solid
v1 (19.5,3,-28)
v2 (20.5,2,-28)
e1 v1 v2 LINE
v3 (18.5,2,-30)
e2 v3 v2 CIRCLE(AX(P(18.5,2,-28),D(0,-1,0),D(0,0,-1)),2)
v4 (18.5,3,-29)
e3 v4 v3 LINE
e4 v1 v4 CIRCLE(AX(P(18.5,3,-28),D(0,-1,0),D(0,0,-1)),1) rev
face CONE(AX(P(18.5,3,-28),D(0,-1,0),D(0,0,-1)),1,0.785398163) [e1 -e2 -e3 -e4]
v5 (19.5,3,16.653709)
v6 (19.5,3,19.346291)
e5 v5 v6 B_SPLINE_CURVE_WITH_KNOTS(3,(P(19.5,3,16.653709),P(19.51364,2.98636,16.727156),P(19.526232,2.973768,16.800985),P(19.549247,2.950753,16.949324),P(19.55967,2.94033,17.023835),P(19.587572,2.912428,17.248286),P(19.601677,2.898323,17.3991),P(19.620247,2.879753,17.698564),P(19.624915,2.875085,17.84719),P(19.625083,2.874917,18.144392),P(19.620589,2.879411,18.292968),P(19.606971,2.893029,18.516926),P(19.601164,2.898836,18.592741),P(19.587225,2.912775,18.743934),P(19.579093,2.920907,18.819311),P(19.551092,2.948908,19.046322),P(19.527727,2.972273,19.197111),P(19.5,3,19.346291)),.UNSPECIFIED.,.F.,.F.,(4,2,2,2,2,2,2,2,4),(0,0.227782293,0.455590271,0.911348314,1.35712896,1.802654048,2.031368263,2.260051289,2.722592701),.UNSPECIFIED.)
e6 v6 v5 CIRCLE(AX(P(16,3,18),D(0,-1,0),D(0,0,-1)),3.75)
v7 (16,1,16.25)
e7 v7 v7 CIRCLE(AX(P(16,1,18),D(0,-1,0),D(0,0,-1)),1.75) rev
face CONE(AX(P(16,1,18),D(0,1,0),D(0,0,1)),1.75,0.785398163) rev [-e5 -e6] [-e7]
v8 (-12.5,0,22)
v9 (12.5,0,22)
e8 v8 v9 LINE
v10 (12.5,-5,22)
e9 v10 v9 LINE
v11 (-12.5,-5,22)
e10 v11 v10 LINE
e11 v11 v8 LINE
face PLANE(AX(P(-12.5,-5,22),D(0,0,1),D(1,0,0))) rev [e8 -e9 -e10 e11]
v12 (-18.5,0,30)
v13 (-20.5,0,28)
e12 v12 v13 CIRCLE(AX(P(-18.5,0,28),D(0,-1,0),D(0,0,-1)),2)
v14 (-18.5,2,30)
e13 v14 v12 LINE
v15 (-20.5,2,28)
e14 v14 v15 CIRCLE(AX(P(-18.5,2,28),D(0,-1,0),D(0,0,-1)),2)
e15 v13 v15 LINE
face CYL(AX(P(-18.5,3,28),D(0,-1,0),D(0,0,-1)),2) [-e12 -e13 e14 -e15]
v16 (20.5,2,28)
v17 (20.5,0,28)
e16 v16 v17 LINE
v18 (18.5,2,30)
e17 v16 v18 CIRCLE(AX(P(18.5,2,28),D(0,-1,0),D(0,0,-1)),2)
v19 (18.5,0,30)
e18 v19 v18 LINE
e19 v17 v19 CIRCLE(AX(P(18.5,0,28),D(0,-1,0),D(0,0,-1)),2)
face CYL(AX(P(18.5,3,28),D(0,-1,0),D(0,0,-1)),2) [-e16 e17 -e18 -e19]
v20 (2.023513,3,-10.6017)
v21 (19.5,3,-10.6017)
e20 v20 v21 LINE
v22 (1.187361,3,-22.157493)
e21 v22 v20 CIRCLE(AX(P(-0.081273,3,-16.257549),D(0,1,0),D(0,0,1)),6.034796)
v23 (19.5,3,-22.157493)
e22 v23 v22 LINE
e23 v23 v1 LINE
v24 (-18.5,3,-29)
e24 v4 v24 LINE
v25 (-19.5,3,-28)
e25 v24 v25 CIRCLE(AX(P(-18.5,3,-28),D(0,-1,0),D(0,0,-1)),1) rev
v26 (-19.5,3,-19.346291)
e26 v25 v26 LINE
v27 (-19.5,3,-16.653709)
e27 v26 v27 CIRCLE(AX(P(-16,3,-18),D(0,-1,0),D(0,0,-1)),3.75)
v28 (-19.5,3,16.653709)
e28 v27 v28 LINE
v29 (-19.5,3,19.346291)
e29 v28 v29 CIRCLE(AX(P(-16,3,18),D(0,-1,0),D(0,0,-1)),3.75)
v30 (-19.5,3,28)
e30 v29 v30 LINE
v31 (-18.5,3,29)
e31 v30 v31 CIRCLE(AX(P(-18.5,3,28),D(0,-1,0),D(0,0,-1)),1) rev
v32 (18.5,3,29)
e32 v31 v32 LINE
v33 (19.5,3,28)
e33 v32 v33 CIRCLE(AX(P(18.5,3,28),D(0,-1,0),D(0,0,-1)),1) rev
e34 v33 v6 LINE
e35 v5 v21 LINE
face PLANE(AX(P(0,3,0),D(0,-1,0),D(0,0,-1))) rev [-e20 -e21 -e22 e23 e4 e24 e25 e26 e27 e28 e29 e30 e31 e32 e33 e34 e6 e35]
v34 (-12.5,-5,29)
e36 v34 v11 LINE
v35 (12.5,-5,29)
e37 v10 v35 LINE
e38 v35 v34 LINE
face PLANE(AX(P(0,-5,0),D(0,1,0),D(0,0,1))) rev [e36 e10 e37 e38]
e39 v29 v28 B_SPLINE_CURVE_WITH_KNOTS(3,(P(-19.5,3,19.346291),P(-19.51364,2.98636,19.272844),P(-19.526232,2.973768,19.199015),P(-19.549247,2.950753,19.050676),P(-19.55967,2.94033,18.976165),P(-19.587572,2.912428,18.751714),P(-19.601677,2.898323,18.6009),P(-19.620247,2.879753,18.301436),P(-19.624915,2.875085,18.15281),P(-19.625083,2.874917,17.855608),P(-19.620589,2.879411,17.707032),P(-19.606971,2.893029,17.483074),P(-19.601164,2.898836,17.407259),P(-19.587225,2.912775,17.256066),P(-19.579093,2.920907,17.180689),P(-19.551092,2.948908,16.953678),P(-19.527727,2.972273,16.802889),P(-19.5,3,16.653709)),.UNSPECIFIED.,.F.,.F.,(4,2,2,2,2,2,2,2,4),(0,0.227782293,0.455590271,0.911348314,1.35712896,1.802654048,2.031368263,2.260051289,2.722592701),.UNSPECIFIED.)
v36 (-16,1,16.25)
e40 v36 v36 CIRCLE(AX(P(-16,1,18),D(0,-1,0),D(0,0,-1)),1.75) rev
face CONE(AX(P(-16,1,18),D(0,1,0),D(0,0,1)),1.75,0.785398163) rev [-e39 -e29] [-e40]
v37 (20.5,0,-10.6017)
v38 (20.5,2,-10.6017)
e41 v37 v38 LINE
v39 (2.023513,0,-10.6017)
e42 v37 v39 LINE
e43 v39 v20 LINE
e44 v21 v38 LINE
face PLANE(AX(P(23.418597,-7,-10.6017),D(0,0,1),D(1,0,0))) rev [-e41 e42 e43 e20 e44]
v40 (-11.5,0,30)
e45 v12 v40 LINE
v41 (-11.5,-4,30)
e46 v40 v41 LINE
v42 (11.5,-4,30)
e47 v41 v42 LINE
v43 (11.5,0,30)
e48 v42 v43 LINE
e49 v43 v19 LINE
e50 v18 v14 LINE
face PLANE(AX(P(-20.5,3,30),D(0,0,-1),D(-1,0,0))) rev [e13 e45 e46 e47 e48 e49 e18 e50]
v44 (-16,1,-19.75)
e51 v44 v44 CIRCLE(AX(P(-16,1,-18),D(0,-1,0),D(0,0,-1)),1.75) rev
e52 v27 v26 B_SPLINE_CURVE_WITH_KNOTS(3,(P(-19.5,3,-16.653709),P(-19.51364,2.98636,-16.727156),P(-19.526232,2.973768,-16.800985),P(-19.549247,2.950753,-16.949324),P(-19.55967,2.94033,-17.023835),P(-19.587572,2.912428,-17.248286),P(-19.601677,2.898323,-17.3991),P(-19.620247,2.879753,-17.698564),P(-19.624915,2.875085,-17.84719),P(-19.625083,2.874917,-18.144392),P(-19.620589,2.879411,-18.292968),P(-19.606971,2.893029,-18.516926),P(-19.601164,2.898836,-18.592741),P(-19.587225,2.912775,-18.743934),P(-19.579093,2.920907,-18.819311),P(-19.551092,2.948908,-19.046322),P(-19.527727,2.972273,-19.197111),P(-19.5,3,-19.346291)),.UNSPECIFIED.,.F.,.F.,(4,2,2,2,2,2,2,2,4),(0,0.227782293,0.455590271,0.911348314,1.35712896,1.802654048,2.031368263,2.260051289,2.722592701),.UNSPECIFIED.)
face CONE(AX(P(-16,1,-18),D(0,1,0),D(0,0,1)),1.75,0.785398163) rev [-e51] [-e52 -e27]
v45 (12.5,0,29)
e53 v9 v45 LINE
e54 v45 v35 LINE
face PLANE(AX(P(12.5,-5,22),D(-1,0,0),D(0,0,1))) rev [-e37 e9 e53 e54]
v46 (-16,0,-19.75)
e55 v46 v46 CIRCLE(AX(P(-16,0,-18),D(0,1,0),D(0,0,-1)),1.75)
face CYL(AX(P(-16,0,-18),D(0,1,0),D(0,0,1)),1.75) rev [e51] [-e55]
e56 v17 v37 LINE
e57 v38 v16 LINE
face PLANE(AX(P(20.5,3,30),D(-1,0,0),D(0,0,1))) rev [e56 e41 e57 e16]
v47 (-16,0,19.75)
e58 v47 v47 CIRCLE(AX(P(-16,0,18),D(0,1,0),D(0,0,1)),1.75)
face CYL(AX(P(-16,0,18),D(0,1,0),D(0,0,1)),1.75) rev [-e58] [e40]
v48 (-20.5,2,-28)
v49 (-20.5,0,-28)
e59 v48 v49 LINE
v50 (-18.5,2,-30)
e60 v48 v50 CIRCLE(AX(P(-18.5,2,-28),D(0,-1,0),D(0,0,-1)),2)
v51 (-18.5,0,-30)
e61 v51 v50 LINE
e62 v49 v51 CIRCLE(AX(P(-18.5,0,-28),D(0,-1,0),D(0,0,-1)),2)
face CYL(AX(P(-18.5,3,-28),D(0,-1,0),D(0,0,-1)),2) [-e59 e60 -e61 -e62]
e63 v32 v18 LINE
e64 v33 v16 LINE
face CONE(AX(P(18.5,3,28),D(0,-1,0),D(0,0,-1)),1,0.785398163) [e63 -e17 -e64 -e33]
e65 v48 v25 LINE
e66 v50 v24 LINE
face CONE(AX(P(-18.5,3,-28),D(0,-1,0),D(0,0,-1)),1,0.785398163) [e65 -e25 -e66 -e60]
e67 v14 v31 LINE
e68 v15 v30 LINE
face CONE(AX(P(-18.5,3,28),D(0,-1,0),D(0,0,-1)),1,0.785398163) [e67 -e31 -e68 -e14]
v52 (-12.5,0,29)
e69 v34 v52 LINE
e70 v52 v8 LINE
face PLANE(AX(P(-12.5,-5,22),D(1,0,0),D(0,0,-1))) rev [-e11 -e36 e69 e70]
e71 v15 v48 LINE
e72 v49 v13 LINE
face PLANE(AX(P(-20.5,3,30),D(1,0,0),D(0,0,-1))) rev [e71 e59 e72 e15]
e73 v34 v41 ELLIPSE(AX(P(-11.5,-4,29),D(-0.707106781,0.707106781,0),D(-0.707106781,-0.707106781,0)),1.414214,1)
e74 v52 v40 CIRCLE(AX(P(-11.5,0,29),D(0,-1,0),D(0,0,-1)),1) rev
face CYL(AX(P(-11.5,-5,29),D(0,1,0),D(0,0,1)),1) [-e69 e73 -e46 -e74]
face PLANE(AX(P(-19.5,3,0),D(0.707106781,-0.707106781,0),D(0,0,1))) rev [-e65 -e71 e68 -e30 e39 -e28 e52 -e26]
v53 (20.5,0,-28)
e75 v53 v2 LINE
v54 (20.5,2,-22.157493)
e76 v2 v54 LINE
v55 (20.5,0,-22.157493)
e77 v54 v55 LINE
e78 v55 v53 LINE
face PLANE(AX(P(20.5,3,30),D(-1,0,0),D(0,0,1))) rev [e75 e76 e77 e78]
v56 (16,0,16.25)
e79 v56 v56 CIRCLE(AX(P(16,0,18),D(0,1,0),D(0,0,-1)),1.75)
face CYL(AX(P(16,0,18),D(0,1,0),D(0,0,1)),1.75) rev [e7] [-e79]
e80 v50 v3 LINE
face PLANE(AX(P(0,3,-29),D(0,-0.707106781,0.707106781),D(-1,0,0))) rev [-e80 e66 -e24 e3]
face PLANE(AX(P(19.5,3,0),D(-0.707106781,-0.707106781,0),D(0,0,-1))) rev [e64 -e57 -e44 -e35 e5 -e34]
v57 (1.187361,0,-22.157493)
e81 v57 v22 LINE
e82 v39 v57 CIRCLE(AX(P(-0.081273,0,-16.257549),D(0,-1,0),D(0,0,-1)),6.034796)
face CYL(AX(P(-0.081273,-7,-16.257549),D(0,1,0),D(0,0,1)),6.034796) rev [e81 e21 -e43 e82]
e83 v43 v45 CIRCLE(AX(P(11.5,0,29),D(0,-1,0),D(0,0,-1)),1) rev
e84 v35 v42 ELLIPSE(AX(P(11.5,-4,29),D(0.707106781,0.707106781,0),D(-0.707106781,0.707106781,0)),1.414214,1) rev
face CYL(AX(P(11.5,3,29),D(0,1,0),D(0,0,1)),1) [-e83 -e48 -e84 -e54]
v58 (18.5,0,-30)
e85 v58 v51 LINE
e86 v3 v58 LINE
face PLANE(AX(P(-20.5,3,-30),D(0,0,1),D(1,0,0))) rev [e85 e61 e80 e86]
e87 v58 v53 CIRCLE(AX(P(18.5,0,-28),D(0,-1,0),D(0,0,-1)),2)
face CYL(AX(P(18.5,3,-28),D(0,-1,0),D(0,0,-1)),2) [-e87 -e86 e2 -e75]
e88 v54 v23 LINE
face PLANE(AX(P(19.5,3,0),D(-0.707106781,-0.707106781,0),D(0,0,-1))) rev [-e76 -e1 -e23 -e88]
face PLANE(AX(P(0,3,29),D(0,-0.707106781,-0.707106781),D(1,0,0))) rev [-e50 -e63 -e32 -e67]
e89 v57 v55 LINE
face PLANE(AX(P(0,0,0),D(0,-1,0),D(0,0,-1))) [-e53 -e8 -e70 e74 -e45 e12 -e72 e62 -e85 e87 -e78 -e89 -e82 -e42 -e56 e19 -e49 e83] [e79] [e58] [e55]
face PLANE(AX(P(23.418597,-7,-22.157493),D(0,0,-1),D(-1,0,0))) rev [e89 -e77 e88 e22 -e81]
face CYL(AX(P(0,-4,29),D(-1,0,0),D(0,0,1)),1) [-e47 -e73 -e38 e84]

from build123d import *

# Parameters (mm, degrees)
SKETCH_1_W          = 41
SKETCH_1_H          = 60
EXTRUDE_1_DEPTH     = 3
SKETCH_2_R          = 1.75
CUT_EXTRUDE_1_DEPTH = 3
FILLET_1_R          = 2
SKETCH_3_W          = 25
SKETCH_3_H          = 8
EXTRUDE_2_DEPTH     = 5
FILLET_2_R          = 1
CHAMFER_2_SIZE      = 1
CHAMFER_1_SIZE      = 2
CUT_EXTRUDE_3_DEPTH = 10


with BuildPart() as part:
    # Эскиз1 → Бобышка-Вытянуть1 (new body)
    with BuildSketch(Plane(origin=(0, 0, 0), x_dir=(1, 0, 0), z_dir=(0, 1, 0))):
        Rectangle(SKETCH_1_W, SKETCH_1_H)
    extrude(amount=EXTRUDE_1_DEPTH)

    # Эскиз2 → Вырез-Вытянуть1 (cut)
    with BuildSketch(Plane(origin=(0, 3, 0), x_dir=(1, 0, 0), z_dir=(0, 1, 0))):
        with Locations(Location((16, 18, 0), (0, 0, 270))):
            Circle(SKETCH_2_R)
        with Locations(Location((16, -18, 0), (0, 0, 90))):
            Circle(SKETCH_2_R)
        with Locations(Location((-16, -18, 0), (0, 0, 270))):
            Circle(SKETCH_2_R)
        with Locations(Location((-16, 18, 0), (0, 0, 90))):
            Circle(SKETCH_2_R)
    extrude(amount=-CUT_EXTRUDE_1_DEPTH, mode=Mode.SUBTRACT)

    # Скругление1
    fillet_1_edges = [part.edges().sort_by_distance(p)[0] for p in [
        (20.5, 1.5, 30),
        (-20.5, 1.5, 30),
        (-20.5, 1.5, -30),
        (20.5, 1.5, -30),
    ]]
    fillet(fillet_1_edges, radius=FILLET_1_R)

    # Эскиз3 → Бобышка-Вытянуть2 (add)
    with BuildSketch(Plane.XZ):
        with Locations((0, 26)):
            Rectangle(SKETCH_3_W, SKETCH_3_H)
    extrude(amount=EXTRUDE_2_DEPTH)

    # Скругление2
    fillet_2_edges = [part.edges().sort_by_distance(p)[0] for p in [
        (12.5, -2.5, 30),
        (-12.5, -2.5, 30),
        (0, -5, 30),
    ]]
    fillet(fillet_2_edges, radius=FILLET_2_R)

    # Фаска2
    chamfer_2_edges = [part.edges().sort_by_distance(p)[0] for p in [
        (0, 3, -30),
        (20.5, 3, 0),
        (-20.5, 3, 0),
        (0, 3, 30),
        (19.914213562, 3, 29.414213562),
        (-19.914213562, 3, 29.414213562),
        (-19.914213562, 3, -29.414213562),
        (19.914213562, 3, -29.414213562),
    ]]
    chamfer(chamfer_2_edges, length=CHAMFER_2_SIZE)

    # Фаска1
    # the kernel refuses this chamfer: 2 mm, written as the material it takes off along each edge
    with BuildSketch(Plane(origin=(-16, 3, -18), x_dir=(0, 0, -1), z_dir=(1, 0, 0))) as chamfer_1_piece_1:
        Polygon((1.75 + CHAMFER_1_SIZE, 0), (1.75, -CHAMFER_1_SIZE), (1.75, 0), align=None)
    revolve(axis=Axis((-16, 3, -18), (0, 1, 0)), mode=Mode.SUBTRACT)
    with BuildSketch(Plane(origin=(-16, 3, 18), x_dir=(0, 0, 1), z_dir=(-1, 0, 0))) as chamfer_1_piece_2:
        Polygon((1.75 + CHAMFER_1_SIZE, 0), (1.75, -CHAMFER_1_SIZE), (1.75, 0), align=None)
    revolve(axis=Axis((-16, 3, 18), (0, 1, 0)), mode=Mode.SUBTRACT)
    with BuildSketch(Plane(origin=(16, 3, 18), x_dir=(0, 0, -1), z_dir=(1, 0, 0))) as chamfer_1_piece_3:
        Polygon((1.75 + CHAMFER_1_SIZE, 0), (1.75, -CHAMFER_1_SIZE), (1.75, 0), align=None)
    revolve(axis=Axis((16, 3, 18), (0, 1, 0)), mode=Mode.SUBTRACT)
    with BuildSketch(Plane(origin=(16, 3, -18), x_dir=(0, 0, 1), z_dir=(-1, 0, 0))) as chamfer_1_piece_4:
        Polygon((1.75 + CHAMFER_1_SIZE, 0), (1.75, -CHAMFER_1_SIZE), (1.75, 0), align=None)
    revolve(axis=Axis((16, 3, -18), (0, 1, 0)), mode=Mode.SUBTRACT)

    # Эскиз4 → Вырез-Вытянуть3 (cut)
    with BuildSketch(Plane(origin=(0, 3, 0), x_dir=(1, 0, 0), z_dir=(0, 1, 0))):
        with BuildLine():
            Line((23.418596888, 22.157492631), (1.187361352, 22.157492631))
            ThreePointArc((1.187361352, 22.157492631), (-6.100332896, 15.822023301), (2.023513442, 10.60169958))
            Line((2.023513442, 10.60169958), (23.418596888, 10.60169958))
            Line((23.418596888, 10.60169958), (23.418596888, 22.157492631))
        make_face()
    extrude(amount=-CUT_EXTRUDE_3_DEPTH, mode=Mode.SUBTRACT)


solid = part.part
